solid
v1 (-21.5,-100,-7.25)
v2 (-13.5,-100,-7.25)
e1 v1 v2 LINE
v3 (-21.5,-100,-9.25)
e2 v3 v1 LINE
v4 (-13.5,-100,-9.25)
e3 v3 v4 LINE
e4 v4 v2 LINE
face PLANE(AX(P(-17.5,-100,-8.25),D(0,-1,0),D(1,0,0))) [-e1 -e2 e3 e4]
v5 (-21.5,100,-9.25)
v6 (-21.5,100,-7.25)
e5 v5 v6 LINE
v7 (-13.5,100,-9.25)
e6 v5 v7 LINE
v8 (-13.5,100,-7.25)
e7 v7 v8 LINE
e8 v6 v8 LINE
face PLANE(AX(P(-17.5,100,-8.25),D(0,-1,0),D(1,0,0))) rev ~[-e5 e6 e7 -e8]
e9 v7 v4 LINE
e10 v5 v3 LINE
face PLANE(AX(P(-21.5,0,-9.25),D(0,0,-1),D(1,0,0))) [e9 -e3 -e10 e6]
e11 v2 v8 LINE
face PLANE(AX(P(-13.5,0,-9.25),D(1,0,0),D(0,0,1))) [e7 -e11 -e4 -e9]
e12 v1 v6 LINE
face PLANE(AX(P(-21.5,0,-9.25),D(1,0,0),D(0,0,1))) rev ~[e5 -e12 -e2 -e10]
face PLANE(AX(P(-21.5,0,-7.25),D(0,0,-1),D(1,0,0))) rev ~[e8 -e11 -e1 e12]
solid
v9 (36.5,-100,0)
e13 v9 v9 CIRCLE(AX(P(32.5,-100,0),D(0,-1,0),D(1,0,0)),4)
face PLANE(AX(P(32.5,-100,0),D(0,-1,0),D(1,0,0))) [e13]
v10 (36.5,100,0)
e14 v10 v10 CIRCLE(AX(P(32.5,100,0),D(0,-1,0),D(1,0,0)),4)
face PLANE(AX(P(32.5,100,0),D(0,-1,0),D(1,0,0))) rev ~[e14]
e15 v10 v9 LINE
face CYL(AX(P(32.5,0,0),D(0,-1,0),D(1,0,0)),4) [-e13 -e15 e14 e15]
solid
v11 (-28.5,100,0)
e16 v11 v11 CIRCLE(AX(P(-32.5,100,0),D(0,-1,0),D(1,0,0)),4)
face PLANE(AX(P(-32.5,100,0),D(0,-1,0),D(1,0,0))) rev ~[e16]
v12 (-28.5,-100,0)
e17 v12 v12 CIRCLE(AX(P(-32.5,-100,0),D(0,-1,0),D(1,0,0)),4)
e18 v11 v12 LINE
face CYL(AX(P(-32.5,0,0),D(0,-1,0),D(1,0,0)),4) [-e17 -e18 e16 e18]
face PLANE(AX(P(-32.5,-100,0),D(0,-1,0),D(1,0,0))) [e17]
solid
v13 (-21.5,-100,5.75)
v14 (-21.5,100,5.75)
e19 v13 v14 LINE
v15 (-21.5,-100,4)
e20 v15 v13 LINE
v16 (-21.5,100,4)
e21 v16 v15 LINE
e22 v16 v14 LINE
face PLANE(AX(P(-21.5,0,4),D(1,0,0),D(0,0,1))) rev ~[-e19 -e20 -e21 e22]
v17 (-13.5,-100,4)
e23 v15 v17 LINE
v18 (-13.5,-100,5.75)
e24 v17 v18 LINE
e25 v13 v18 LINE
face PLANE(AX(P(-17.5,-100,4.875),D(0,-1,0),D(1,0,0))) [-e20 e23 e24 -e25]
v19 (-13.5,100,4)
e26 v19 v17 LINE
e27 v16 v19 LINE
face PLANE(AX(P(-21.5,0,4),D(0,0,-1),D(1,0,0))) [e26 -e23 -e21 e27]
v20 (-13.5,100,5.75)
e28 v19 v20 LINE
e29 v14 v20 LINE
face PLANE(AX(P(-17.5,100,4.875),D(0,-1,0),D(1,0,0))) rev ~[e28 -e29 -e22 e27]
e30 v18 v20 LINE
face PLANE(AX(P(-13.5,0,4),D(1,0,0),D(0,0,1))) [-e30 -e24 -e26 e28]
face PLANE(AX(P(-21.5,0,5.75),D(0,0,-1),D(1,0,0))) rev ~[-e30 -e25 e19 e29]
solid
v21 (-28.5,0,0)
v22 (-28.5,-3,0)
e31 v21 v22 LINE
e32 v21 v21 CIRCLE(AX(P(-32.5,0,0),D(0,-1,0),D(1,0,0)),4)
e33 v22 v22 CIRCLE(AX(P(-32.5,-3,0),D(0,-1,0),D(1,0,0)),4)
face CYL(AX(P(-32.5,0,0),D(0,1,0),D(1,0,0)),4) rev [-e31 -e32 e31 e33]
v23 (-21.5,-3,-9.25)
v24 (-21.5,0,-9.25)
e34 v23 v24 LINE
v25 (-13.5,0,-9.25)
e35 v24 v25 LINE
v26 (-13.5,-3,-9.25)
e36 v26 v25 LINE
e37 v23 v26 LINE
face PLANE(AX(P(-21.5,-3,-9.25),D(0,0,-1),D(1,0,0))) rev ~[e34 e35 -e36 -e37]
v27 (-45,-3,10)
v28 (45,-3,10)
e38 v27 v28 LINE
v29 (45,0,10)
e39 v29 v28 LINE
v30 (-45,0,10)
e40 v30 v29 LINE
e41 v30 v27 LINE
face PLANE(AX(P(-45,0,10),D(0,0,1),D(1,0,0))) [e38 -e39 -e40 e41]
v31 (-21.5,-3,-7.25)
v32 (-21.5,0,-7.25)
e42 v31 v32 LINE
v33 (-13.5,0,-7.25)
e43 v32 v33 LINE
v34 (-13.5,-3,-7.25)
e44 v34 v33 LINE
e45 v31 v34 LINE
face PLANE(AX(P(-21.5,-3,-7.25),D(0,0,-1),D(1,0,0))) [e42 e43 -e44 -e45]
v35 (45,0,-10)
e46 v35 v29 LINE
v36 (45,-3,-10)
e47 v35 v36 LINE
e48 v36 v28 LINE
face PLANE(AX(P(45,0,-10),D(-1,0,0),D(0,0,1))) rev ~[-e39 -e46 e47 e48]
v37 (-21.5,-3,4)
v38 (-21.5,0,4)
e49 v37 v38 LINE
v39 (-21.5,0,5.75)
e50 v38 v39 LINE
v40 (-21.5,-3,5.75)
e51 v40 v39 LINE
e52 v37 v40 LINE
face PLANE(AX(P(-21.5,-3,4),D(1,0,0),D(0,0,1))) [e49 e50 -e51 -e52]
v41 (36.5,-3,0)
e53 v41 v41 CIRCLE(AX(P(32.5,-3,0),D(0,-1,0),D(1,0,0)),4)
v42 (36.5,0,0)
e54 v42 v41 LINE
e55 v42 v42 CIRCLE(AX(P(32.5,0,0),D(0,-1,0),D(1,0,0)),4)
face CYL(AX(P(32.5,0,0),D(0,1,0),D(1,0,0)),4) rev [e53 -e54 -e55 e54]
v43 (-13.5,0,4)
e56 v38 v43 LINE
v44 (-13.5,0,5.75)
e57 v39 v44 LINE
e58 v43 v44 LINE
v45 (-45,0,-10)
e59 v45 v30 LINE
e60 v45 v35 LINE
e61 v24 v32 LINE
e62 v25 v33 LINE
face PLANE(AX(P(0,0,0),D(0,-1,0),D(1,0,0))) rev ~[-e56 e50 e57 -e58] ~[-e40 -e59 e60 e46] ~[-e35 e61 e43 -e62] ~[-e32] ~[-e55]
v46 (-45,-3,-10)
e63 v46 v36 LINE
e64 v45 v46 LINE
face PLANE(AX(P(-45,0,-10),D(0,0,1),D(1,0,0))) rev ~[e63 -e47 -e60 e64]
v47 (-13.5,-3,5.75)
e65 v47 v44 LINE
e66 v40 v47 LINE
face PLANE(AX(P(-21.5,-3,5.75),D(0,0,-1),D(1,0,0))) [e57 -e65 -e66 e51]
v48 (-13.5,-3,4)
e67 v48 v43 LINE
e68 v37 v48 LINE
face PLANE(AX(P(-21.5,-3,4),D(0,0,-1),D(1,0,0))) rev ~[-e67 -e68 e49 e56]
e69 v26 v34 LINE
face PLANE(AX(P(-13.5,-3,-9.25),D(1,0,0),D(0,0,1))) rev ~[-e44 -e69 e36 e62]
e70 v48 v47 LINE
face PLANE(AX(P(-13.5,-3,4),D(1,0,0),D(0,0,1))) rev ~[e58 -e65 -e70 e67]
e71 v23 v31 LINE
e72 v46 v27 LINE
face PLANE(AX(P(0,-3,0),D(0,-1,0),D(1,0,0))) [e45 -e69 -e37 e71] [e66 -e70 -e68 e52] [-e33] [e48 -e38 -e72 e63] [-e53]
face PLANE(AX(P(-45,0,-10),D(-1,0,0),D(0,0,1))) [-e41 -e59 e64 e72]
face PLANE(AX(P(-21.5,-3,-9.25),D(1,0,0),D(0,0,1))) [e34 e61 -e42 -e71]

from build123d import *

# Parameters (mm, degrees)
F0_R     = 4
F1_DEPTH = 100
F0_W     = 8
F0_H     = 1.75
F0_H_2   = 2
F2_W     = 90
F2_H     = 20
F2_R     = 4
F3_DEPTH = 3
F4_W     = 8
F4_H     = 1.75
F4_H_2   = 2
F5_DEPTH = 25


with BuildPart() as f1:
    # F0 (on Front) → F1 (new body, symmetric)
    with BuildSketch(Plane.XZ):
        with Locations((-32.5, 0)):
            Circle(F0_R)
    extrude(amount=F1_DEPTH, both=True)


with BuildPart() as f1b:
    # F0 (on Front) → F1, piece 2 (new body, symmetric)
    with BuildSketch(Plane.XZ):
        with Locations((-17.5, 4.875)):
            Rectangle(F0_W, F0_H)
    extrude(amount=F1_DEPTH, both=True)


with BuildPart() as f1c:
    # F0 (on Front) → F1, piece 3 (new body, symmetric)
    with BuildSketch(Plane.XZ):
        with Locations((-17.5, -8.25)):
            Rectangle(F0_W, F0_H_2)
    extrude(amount=F1_DEPTH, both=True)


with BuildPart() as f1d:
    # F0 (on Front) → F1, piece 4 (new body, symmetric)
    with BuildSketch(Plane.XZ):
        with Locations((32.5, 0)):
            Circle(F0_R)
    extrude(amount=F1_DEPTH, both=True)


with BuildPart() as f3:
    # F2 (on Front) → F3 (new body)
    with BuildSketch(Plane.XZ):
        Rectangle(F2_W, F2_H)
        with Locations((-32.5, 0)):
            Circle(F2_R, mode=Mode.SUBTRACT)
        with Locations((32.5, 0)):
            Circle(F2_R, mode=Mode.SUBTRACT)
    extrude(amount=F3_DEPTH)

    # F4 (on face) → F5 (cut)
    with BuildSketch(Plane.XZ.offset(3)):
        with Locations((-17.5, 4.875)):
            Rectangle(F4_W, F4_H)
        with Locations((-17.5, -8.25)):
            Rectangle(F4_W, F4_H_2)
    extrude(amount=-F5_DEPTH, mode=Mode.SUBTRACT)


solid = Compound([f1.part, f1b.part, f1c.part, f1d.part, f3.part])
